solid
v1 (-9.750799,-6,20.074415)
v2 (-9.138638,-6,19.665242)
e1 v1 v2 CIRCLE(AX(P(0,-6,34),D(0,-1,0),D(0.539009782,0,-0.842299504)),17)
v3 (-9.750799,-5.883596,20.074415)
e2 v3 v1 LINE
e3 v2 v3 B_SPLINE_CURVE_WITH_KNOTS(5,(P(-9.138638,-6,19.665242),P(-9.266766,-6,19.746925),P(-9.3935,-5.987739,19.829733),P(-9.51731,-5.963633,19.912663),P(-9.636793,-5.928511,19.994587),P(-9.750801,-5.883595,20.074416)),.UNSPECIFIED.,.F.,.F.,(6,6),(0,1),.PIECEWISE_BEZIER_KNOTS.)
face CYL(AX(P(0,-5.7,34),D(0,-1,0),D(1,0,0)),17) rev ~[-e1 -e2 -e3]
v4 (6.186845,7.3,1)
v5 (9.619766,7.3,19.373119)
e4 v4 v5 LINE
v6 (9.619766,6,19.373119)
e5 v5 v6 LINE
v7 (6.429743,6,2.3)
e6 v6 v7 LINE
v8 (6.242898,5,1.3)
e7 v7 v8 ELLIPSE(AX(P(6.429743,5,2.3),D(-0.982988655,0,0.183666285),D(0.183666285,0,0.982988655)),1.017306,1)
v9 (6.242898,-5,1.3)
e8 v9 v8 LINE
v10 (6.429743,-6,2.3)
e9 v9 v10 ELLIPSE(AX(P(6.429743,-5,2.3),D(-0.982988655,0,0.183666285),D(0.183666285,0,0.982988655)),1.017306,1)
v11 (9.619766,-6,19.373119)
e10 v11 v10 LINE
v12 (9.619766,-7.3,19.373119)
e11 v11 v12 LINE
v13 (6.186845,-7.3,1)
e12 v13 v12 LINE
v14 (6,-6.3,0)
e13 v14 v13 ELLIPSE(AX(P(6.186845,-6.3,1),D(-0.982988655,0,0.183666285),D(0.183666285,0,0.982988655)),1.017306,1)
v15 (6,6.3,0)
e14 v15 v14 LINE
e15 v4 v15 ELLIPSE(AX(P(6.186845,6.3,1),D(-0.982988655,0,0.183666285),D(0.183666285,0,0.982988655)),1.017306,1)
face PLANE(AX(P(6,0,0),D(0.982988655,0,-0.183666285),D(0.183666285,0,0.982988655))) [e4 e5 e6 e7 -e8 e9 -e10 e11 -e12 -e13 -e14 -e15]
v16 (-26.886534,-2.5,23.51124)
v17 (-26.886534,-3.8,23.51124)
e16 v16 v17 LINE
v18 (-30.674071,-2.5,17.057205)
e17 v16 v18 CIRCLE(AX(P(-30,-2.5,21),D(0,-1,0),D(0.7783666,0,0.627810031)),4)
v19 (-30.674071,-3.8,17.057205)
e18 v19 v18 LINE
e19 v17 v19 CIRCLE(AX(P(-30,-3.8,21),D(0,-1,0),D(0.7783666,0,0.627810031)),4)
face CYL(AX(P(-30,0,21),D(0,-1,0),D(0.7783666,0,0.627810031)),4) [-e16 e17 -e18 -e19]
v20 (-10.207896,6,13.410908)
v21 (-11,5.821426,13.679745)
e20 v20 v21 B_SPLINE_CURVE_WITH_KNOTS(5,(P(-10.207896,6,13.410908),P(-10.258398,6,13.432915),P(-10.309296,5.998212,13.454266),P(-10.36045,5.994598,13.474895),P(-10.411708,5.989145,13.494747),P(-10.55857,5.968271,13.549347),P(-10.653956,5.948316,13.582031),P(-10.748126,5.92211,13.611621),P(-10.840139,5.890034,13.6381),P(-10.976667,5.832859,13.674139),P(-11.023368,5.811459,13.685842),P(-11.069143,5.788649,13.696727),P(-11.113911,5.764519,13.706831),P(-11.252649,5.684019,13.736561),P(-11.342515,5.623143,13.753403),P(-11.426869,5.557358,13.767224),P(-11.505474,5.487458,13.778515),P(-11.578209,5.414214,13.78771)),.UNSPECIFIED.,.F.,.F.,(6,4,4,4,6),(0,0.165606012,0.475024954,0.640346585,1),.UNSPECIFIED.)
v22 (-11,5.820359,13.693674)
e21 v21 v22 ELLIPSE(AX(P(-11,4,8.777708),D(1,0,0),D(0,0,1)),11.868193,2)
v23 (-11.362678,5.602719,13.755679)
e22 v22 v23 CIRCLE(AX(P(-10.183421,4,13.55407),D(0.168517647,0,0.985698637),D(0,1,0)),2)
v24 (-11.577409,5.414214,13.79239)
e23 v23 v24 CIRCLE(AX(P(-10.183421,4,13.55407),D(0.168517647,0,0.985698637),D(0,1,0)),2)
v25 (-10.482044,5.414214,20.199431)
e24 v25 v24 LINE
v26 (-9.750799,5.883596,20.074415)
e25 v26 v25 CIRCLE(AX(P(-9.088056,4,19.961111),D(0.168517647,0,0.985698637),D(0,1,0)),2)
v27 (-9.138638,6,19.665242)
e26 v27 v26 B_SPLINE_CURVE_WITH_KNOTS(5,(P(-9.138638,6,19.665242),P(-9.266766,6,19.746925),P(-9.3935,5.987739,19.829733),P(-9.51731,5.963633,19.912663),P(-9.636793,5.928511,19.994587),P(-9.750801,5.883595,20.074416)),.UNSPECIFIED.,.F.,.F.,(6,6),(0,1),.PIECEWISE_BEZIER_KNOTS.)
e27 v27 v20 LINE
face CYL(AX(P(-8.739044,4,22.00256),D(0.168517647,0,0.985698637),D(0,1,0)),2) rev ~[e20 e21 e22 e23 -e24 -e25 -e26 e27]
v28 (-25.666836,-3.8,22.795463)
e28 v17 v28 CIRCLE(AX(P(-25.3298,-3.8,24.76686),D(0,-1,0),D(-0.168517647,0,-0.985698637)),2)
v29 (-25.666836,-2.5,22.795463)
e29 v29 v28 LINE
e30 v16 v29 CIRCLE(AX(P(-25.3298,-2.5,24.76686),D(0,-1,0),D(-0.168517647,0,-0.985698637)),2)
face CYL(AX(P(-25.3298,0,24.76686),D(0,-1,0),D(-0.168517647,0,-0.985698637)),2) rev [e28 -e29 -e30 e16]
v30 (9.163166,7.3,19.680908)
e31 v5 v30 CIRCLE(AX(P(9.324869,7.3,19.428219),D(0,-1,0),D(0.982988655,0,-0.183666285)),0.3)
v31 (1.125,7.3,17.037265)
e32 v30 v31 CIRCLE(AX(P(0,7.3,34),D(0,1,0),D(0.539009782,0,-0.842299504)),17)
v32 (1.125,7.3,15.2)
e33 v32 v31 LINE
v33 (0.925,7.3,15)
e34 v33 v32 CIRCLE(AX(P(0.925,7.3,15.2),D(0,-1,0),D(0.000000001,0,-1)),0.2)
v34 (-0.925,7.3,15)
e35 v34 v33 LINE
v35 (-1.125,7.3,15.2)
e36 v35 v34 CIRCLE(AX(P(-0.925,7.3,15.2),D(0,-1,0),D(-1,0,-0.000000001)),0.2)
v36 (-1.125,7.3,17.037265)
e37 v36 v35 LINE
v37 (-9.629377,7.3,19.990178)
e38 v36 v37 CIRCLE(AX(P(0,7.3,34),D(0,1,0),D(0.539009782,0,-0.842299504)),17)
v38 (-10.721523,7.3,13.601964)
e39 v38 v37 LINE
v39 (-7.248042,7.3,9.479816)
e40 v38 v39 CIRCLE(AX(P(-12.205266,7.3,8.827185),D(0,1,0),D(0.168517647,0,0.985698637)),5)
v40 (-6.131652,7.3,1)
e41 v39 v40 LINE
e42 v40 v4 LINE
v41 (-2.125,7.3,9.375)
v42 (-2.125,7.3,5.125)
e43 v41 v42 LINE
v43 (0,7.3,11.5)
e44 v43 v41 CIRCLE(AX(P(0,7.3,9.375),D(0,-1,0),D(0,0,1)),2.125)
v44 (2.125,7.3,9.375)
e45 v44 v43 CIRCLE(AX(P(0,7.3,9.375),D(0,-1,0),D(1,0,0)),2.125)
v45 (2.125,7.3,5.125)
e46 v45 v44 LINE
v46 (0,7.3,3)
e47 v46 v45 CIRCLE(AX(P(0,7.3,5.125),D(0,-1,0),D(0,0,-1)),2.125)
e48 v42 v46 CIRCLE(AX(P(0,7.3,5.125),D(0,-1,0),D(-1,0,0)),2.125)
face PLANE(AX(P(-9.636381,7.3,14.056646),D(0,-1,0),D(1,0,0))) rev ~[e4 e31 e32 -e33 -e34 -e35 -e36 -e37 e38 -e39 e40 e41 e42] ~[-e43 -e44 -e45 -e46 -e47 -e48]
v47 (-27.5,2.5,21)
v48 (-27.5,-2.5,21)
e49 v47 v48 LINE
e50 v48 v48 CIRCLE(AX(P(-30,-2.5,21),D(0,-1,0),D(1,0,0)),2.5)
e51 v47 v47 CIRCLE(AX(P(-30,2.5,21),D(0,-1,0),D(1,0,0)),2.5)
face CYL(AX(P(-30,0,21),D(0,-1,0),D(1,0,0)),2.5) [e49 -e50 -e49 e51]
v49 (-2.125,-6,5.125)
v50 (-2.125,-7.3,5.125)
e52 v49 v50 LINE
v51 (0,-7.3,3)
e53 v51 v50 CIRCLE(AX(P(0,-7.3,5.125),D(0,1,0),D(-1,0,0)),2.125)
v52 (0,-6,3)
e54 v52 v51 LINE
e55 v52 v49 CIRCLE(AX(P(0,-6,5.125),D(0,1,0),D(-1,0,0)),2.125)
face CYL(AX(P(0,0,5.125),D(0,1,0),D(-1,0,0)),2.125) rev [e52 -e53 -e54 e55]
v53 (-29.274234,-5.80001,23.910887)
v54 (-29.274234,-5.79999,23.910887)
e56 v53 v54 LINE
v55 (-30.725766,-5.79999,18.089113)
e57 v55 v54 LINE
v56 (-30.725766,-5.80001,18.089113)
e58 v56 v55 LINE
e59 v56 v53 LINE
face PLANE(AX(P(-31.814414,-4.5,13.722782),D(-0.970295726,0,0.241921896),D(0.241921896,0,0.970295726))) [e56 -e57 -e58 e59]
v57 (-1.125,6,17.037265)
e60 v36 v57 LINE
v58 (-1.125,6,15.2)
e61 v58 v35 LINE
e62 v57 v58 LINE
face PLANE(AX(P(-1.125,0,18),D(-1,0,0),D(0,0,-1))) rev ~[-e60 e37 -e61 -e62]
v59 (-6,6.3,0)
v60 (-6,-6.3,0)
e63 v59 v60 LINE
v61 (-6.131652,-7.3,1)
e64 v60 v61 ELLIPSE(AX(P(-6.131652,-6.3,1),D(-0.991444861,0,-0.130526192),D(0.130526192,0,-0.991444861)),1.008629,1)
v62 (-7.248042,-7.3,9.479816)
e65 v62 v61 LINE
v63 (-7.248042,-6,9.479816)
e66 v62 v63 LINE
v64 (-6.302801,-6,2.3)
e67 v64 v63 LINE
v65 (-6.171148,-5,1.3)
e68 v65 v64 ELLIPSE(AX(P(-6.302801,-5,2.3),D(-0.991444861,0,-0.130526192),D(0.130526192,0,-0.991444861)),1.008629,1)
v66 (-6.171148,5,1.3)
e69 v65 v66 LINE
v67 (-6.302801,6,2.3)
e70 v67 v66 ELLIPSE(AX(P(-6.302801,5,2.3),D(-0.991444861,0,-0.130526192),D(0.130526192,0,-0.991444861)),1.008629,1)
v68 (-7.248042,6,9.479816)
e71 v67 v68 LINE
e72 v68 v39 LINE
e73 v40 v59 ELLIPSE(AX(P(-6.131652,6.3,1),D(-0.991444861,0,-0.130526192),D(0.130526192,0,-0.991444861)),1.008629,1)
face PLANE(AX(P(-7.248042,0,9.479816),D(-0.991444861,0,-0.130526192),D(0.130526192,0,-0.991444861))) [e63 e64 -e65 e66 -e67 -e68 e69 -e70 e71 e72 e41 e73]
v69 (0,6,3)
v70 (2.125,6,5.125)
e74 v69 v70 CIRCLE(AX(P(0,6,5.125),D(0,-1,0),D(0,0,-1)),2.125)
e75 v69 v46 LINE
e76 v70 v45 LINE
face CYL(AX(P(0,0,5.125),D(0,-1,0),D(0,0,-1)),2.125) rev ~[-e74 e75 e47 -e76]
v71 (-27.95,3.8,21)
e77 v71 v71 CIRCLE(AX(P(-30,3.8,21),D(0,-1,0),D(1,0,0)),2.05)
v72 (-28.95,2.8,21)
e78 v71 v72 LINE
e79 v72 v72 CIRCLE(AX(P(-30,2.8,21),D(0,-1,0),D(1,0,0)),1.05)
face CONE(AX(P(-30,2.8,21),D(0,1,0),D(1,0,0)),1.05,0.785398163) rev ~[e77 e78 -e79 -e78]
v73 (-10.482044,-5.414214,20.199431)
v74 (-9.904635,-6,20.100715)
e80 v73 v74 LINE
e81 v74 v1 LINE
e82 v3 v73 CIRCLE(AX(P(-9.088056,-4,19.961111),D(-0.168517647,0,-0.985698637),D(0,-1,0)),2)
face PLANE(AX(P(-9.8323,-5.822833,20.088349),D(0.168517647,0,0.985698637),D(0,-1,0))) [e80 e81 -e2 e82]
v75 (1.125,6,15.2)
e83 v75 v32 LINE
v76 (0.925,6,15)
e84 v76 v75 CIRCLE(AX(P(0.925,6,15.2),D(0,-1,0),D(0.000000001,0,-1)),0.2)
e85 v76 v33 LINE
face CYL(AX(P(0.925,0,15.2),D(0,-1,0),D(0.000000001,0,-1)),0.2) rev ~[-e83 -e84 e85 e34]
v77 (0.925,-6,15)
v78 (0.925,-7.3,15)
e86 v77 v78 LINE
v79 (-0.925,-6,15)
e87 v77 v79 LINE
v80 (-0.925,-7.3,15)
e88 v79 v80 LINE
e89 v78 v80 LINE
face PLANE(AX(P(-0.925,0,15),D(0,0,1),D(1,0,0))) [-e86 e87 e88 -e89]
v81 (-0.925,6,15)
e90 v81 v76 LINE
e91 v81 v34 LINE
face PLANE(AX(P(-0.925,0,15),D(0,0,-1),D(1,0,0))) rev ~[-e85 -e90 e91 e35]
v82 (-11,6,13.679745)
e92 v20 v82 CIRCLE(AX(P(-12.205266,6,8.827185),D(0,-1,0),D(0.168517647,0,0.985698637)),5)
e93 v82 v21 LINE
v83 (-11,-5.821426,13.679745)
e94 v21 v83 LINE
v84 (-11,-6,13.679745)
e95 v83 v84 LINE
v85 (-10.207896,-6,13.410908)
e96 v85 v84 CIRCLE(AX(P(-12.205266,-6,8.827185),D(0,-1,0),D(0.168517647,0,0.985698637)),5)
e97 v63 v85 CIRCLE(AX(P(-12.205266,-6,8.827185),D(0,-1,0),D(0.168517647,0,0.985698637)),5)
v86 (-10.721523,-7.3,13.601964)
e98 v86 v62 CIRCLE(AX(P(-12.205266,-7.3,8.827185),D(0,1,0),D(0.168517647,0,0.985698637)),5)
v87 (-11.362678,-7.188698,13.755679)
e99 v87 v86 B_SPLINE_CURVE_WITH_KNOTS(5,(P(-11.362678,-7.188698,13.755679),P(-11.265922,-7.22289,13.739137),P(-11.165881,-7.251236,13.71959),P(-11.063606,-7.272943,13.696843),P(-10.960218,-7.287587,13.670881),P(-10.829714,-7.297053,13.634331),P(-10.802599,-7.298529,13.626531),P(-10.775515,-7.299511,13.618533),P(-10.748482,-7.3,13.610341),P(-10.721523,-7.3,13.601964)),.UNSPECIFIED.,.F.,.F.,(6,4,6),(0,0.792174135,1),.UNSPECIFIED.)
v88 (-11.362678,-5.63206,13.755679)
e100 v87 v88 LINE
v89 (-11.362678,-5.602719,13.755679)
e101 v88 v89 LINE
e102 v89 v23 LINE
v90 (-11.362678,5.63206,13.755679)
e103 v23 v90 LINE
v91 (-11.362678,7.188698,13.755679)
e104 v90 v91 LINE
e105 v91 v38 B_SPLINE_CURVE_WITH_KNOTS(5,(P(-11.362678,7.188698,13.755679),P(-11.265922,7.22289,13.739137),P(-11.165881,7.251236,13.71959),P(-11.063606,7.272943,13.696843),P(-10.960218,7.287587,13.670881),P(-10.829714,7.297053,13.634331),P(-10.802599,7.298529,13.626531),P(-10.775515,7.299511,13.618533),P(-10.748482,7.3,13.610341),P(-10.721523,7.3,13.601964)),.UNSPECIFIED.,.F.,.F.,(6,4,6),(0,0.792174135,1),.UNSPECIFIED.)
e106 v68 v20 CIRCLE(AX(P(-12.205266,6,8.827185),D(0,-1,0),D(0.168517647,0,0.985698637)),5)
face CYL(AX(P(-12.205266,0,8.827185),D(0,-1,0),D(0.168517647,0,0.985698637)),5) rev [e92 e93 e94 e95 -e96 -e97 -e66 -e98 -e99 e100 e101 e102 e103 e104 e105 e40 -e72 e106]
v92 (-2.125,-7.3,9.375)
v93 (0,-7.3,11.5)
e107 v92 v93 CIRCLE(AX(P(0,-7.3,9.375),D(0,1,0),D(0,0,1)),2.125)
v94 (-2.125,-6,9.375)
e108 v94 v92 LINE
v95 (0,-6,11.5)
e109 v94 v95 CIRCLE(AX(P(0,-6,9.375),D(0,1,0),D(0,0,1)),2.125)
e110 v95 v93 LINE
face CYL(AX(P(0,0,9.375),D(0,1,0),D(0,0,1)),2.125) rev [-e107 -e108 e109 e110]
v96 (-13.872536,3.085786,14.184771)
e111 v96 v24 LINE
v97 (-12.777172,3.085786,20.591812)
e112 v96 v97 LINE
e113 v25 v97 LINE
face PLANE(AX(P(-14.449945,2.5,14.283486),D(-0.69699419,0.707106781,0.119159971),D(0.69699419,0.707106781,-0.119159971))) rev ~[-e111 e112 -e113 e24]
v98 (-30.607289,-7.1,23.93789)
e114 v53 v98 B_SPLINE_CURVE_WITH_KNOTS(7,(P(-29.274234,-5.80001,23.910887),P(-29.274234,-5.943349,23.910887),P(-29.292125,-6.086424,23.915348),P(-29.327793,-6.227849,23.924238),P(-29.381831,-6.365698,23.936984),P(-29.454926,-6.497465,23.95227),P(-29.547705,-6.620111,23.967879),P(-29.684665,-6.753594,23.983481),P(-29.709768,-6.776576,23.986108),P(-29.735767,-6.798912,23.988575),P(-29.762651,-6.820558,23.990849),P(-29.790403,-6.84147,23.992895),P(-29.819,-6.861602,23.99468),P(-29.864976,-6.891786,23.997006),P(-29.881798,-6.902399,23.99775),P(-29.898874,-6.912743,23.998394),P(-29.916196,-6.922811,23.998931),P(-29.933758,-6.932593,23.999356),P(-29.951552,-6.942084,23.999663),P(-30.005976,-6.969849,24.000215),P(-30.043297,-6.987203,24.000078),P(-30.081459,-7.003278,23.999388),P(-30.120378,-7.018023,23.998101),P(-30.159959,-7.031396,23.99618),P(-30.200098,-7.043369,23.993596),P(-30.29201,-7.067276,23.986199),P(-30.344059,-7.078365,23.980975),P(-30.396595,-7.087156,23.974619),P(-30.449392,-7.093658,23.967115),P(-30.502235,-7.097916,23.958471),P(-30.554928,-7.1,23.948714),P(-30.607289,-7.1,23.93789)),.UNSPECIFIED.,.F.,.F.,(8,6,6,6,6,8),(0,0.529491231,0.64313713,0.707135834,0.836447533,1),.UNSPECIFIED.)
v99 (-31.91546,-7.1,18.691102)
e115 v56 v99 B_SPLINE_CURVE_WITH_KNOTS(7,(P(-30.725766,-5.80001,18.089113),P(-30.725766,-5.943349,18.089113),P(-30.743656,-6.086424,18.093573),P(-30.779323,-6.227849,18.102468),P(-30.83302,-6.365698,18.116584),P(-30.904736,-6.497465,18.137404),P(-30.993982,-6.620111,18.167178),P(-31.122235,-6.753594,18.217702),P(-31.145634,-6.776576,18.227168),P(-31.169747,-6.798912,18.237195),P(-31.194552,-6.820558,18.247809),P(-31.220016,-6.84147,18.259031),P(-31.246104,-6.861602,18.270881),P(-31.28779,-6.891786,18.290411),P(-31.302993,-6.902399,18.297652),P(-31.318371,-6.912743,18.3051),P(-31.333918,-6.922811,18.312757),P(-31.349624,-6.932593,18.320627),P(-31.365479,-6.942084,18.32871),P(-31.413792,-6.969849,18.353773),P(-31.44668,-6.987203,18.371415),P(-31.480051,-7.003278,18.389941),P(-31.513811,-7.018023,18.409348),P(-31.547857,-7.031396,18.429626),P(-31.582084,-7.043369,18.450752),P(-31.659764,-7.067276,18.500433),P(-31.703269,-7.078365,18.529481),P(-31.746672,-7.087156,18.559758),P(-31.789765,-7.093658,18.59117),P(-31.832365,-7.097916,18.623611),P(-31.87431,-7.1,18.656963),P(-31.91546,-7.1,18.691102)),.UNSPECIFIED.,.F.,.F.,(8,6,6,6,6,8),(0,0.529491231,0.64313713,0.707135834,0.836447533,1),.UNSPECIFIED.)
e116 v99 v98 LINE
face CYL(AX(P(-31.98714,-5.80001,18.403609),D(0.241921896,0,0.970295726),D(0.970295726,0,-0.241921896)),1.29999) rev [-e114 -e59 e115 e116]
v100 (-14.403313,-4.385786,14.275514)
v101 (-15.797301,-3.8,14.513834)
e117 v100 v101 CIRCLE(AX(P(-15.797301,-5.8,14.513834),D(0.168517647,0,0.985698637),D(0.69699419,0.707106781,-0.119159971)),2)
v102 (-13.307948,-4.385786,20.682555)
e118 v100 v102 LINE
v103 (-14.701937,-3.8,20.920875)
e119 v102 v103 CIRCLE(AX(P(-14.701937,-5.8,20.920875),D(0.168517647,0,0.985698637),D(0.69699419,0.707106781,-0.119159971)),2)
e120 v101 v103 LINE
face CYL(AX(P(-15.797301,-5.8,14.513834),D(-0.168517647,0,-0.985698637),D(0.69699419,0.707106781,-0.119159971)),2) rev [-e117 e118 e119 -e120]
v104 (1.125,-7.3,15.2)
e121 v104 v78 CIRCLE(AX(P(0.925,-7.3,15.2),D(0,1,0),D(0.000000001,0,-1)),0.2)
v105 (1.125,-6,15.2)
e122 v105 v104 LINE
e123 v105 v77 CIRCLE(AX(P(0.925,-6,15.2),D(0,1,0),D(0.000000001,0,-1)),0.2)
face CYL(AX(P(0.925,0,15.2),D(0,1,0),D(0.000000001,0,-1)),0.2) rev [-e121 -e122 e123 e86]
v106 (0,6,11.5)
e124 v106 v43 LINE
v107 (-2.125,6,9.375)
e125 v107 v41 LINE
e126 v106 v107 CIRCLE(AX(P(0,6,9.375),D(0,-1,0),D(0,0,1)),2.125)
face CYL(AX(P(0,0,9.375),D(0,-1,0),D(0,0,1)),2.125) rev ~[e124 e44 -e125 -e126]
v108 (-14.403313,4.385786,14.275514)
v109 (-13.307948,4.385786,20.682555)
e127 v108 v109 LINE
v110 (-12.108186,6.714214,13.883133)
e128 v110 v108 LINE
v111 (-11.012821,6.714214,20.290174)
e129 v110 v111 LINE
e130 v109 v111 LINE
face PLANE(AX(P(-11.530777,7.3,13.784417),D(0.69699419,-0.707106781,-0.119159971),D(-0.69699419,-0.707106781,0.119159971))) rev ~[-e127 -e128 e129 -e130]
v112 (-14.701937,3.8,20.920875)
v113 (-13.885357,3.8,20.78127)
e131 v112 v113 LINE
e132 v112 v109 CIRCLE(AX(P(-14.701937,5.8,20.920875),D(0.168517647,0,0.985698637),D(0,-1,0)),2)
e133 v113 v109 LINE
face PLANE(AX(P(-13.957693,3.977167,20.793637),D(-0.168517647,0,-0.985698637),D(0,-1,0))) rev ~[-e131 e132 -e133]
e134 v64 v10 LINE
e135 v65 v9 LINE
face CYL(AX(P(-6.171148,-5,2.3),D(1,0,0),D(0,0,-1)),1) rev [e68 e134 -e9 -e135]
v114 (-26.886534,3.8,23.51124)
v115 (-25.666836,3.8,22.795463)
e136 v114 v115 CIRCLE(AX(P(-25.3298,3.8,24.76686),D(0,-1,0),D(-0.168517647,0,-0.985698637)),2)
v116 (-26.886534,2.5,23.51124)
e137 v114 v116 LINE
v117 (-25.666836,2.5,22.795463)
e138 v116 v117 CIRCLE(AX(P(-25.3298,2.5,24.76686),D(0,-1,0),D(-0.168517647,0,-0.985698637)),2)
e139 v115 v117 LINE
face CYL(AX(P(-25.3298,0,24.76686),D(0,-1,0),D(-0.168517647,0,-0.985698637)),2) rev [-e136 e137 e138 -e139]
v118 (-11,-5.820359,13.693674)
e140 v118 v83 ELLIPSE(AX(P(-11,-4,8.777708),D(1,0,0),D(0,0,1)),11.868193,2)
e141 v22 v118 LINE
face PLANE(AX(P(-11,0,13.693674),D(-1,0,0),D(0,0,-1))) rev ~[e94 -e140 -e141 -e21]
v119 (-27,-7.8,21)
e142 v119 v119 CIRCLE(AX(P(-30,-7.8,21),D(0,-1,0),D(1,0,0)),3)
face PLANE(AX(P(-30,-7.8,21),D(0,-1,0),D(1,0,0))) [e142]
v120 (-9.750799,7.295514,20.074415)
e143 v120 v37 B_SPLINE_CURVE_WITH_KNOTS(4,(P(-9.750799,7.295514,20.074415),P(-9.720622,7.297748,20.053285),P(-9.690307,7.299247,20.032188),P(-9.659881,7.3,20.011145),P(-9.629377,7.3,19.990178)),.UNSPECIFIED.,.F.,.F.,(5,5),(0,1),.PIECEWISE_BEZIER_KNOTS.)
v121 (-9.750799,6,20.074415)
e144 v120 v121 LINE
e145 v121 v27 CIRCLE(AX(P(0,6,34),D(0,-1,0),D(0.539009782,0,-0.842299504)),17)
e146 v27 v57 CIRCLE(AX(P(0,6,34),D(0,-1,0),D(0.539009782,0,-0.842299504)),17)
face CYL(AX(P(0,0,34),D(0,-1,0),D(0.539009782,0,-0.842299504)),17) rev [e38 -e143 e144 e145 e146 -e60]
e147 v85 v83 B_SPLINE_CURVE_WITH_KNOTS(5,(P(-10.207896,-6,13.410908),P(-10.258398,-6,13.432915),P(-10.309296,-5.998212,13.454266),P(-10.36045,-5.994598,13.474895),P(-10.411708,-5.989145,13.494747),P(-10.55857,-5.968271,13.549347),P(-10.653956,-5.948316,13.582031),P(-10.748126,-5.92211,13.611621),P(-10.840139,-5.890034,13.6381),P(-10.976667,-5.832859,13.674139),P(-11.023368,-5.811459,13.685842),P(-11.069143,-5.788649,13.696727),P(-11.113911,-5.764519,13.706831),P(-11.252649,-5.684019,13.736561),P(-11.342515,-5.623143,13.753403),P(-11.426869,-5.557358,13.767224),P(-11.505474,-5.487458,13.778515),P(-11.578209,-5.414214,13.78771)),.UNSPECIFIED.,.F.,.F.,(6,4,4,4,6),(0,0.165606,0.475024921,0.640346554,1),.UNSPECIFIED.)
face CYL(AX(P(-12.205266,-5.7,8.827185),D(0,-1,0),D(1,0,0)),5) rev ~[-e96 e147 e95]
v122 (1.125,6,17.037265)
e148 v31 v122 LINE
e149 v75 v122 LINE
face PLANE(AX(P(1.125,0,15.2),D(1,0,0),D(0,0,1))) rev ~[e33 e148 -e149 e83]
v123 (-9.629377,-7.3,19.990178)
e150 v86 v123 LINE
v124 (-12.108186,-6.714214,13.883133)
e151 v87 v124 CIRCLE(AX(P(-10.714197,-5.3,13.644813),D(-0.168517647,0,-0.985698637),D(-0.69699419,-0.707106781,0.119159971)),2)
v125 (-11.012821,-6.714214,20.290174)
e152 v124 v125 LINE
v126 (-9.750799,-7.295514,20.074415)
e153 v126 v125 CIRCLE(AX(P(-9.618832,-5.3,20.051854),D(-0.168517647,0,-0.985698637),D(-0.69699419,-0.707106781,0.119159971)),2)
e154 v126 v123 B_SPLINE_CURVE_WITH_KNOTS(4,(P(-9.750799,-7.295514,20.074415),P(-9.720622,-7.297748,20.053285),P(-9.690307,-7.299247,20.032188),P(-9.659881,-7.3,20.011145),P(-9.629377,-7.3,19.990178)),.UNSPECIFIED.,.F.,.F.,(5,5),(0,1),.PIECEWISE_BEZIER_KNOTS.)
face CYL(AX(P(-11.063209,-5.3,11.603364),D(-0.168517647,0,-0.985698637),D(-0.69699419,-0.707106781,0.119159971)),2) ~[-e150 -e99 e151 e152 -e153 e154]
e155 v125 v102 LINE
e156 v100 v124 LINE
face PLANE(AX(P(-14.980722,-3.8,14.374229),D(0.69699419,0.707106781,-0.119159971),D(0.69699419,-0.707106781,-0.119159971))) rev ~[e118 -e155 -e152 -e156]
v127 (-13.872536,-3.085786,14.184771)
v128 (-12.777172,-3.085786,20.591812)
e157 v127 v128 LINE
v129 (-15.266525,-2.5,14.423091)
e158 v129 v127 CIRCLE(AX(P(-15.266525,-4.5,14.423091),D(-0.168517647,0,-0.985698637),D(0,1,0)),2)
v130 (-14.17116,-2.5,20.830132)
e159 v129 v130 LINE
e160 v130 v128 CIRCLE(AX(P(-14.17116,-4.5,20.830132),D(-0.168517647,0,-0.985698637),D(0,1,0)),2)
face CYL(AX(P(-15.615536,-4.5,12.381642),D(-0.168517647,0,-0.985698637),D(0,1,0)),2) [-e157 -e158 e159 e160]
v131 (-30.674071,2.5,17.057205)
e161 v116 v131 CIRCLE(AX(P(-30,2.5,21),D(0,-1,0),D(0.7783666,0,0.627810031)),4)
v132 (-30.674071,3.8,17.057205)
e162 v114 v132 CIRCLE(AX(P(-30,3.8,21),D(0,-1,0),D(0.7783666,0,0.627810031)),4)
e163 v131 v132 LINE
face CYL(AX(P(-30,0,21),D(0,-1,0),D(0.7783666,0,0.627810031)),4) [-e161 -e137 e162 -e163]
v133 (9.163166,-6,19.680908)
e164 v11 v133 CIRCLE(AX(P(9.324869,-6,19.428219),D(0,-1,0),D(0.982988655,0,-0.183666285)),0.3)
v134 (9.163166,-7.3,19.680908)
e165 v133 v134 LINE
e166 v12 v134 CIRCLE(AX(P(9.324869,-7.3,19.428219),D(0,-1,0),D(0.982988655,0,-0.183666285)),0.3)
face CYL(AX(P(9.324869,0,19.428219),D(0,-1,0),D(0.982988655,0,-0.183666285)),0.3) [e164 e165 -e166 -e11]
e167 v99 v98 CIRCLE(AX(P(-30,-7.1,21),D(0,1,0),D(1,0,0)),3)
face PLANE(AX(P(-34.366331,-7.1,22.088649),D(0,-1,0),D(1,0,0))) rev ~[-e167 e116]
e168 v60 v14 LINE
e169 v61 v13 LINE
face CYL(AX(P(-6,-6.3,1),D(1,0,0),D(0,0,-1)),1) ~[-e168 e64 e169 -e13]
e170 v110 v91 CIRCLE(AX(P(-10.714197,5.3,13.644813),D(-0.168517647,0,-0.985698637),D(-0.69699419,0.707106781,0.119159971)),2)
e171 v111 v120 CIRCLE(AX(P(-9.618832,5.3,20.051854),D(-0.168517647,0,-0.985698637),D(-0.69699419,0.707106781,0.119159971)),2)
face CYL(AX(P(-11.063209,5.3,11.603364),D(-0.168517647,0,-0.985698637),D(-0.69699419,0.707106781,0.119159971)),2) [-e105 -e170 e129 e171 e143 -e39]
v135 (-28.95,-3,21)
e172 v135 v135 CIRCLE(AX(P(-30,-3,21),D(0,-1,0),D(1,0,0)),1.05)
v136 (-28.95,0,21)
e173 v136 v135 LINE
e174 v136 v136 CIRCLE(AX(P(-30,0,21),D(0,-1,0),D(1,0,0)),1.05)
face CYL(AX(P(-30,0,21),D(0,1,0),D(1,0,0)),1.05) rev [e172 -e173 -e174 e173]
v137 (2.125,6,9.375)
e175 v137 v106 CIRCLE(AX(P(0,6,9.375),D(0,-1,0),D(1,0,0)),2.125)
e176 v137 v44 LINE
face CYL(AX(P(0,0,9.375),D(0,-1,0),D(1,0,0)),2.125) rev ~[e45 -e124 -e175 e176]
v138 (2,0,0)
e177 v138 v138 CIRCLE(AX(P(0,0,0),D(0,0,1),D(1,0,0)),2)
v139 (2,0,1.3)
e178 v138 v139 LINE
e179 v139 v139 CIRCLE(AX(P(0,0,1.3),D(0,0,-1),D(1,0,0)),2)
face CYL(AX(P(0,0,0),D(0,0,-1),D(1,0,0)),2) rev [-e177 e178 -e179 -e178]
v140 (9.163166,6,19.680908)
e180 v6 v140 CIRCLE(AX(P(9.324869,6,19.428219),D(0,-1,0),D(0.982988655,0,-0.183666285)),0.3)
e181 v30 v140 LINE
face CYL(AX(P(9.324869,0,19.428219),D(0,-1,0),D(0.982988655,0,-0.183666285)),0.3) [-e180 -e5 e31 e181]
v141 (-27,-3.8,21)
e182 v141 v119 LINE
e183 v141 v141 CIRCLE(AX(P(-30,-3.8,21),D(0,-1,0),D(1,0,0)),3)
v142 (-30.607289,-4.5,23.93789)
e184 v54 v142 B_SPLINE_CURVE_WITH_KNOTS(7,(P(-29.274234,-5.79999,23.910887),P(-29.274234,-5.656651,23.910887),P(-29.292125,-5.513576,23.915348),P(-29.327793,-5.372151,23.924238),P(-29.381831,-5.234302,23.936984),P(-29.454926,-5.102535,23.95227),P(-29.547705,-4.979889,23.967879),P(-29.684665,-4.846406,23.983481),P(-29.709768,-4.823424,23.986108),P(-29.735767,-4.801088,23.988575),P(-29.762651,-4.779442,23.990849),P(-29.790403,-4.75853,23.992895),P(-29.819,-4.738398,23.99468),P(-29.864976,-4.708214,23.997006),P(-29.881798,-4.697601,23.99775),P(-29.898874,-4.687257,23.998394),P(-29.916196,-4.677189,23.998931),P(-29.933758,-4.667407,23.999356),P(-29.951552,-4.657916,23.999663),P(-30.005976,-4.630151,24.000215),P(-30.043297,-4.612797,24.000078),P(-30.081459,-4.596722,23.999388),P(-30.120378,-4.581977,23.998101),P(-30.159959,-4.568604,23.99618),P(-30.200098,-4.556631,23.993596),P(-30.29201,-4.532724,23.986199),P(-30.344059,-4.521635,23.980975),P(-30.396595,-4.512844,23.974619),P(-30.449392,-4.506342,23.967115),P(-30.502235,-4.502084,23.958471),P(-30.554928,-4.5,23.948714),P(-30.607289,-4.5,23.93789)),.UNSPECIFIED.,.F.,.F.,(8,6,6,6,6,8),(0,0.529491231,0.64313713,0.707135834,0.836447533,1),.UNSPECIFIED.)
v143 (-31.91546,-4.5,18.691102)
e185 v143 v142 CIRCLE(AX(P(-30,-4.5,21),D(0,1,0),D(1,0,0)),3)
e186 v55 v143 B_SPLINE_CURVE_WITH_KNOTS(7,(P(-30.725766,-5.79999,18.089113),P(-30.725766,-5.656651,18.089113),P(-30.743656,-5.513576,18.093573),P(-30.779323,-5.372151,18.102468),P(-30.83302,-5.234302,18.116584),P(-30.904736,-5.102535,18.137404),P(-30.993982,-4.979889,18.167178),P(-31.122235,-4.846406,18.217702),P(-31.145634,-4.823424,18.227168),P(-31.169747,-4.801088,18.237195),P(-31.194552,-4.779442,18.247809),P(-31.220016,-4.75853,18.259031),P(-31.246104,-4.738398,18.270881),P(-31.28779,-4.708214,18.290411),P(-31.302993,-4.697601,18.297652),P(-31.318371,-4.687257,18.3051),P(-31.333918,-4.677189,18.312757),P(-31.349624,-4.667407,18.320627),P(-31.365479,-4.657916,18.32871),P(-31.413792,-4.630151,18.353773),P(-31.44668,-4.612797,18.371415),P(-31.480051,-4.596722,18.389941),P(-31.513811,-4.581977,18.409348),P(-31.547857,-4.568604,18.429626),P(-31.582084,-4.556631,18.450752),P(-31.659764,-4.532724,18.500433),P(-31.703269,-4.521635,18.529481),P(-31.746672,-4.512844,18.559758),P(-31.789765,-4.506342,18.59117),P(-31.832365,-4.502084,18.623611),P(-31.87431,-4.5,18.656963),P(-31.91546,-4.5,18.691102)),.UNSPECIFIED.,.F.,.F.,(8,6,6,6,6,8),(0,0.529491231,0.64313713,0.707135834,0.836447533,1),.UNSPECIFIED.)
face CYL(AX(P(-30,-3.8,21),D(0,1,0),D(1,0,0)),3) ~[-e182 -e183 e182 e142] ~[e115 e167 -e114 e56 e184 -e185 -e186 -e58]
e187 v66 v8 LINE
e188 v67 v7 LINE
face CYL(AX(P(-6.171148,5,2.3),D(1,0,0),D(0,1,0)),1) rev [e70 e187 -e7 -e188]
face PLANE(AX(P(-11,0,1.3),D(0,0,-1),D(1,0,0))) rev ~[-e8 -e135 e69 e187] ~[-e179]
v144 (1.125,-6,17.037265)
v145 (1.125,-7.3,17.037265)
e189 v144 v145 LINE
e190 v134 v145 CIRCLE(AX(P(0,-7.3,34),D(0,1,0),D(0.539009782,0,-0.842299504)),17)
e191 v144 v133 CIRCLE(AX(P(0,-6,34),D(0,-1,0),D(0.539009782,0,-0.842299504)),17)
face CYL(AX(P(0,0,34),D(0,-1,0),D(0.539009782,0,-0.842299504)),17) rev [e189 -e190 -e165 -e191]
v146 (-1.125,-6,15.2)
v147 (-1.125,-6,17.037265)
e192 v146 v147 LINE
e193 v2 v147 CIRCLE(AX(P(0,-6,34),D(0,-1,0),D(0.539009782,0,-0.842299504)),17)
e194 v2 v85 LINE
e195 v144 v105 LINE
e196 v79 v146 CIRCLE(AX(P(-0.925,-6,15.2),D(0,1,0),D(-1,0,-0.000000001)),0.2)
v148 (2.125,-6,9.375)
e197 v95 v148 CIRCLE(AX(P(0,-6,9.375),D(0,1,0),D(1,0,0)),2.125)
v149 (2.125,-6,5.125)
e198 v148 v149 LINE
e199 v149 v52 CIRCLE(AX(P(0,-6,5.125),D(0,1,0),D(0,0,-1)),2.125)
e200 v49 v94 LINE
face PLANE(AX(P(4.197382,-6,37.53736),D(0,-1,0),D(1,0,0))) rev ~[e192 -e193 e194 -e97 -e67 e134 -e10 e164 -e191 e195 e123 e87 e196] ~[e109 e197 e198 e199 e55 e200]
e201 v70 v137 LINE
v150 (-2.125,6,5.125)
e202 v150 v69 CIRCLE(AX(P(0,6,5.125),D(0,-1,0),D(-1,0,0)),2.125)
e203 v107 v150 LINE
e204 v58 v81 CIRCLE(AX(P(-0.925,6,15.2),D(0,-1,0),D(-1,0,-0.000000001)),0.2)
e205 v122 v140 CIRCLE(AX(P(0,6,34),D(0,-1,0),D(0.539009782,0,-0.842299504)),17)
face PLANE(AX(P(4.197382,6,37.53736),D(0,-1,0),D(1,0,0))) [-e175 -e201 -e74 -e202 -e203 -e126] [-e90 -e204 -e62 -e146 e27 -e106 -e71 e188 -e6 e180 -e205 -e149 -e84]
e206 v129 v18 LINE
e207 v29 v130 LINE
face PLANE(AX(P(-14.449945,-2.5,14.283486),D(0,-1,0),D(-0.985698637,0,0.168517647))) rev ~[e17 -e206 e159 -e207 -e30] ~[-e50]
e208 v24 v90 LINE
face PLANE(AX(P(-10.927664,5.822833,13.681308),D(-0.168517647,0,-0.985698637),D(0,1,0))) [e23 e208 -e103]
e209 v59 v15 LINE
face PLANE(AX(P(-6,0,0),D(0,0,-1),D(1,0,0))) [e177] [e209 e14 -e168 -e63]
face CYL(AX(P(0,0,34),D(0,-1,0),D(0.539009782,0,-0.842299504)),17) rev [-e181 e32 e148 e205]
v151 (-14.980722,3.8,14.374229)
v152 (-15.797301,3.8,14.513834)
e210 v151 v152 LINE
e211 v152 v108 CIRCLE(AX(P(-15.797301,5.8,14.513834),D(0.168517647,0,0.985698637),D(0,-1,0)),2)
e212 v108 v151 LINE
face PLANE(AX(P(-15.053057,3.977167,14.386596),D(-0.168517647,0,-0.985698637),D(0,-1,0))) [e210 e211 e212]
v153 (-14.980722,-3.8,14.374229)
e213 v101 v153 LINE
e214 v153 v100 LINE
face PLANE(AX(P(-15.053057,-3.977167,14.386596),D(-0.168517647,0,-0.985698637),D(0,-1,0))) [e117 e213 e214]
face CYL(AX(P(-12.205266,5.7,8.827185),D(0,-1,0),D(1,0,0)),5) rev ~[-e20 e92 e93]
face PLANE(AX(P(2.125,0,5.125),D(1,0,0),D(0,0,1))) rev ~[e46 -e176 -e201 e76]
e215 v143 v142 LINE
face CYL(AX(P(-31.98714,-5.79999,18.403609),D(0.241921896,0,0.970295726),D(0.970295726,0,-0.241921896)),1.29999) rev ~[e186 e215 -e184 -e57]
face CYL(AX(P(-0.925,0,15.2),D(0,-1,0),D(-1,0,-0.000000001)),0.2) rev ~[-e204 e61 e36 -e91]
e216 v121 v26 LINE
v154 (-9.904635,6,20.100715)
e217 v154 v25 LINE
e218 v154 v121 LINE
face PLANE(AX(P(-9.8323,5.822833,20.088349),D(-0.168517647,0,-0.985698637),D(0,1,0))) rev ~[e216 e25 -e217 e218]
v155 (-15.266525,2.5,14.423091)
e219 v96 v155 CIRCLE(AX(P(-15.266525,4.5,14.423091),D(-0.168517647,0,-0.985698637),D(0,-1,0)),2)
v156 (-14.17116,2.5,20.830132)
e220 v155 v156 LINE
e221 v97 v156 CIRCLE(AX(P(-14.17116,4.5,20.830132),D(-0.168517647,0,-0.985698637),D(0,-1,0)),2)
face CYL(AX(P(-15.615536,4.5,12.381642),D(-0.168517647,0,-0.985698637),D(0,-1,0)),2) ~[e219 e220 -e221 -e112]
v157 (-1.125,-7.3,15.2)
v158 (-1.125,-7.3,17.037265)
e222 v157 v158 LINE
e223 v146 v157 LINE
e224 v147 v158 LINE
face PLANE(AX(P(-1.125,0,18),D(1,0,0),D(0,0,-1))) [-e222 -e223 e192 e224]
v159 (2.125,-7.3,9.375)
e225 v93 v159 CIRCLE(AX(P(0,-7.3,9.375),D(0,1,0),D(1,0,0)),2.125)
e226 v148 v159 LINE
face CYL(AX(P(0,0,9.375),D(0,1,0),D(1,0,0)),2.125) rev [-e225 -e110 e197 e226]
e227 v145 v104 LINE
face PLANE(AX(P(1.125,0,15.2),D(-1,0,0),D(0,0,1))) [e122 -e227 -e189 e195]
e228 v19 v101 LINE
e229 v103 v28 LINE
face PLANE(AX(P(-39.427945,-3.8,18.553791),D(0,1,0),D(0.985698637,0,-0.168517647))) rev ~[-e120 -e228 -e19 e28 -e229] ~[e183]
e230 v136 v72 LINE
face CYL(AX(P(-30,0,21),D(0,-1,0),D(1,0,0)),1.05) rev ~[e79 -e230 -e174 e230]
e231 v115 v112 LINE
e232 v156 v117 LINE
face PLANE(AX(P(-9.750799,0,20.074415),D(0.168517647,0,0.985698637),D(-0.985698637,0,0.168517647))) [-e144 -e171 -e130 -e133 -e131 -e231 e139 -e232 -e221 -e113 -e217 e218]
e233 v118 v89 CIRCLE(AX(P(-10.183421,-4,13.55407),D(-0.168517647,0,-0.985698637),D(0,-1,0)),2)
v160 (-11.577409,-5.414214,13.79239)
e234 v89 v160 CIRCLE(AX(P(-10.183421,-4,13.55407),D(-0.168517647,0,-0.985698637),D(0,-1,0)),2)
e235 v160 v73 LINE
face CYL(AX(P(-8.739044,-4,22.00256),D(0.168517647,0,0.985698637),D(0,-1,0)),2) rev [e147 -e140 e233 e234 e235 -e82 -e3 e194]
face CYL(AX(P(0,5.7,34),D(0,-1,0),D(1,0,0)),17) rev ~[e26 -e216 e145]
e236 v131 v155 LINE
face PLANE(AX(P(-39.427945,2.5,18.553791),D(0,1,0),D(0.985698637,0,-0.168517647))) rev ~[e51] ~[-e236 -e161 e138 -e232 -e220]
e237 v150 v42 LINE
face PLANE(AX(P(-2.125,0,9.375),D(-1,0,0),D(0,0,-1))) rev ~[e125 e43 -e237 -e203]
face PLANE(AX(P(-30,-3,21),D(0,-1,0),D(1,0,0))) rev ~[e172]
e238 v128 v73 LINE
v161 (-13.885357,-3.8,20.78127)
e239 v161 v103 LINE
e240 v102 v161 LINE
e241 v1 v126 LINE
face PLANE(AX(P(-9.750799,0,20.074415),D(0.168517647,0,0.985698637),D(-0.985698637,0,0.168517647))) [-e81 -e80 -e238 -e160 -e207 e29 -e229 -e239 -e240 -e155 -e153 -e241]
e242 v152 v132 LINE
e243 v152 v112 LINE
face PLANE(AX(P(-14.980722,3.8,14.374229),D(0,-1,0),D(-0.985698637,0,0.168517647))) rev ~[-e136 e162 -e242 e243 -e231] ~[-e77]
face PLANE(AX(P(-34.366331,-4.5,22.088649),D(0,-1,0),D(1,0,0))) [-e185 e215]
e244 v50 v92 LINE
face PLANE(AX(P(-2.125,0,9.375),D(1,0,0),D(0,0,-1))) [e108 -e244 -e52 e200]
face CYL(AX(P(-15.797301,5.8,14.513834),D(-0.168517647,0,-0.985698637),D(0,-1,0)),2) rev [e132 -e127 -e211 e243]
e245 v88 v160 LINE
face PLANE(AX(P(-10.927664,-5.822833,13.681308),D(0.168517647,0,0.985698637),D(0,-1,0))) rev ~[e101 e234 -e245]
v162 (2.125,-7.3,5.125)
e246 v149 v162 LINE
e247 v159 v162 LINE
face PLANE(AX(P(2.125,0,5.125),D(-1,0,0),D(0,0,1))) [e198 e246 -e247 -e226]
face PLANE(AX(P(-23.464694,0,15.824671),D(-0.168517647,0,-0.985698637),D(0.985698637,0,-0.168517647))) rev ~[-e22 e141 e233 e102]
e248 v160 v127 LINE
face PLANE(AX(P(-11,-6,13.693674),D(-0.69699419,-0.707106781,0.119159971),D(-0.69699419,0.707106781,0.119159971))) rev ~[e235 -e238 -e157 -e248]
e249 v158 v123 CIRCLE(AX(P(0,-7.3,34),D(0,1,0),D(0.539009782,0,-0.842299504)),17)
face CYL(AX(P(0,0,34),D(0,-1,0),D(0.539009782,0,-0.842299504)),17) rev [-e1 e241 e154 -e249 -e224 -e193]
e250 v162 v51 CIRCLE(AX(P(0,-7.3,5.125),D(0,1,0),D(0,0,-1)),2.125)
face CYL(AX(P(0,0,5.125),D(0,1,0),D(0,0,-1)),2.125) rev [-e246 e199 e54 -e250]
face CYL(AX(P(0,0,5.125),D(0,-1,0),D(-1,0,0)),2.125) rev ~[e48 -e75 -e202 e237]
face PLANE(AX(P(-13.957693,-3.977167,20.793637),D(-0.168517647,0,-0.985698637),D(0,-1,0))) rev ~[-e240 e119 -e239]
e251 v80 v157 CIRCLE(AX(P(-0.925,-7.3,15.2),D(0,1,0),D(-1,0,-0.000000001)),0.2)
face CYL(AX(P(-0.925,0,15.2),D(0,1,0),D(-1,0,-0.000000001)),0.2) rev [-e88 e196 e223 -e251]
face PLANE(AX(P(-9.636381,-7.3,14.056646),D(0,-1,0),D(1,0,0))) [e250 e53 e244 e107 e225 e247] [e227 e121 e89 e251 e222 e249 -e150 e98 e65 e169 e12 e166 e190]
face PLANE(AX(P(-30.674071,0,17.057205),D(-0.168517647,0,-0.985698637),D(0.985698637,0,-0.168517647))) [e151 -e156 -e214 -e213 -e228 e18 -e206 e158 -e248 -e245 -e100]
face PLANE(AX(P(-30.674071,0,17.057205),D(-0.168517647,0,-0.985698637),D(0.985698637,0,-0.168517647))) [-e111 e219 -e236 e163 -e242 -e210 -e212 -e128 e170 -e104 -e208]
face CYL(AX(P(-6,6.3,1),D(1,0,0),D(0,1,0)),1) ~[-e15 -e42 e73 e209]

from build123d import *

# Parameters (mm, degrees)
F1_DEPTH       = 7.3
F1_DEPTH_BACK  = 7.3
F3_DEPTH       = 6
F3_DEPTH_BACK  = 6
F5_DEPTH       = 10
F5_DEPTH_BACK  = 10
F8_DEPTH       = 25
F9_R           = 2.5
F10_DEPTH      = 2.5
F10_DEPTH_BACK = 2.5
F11_T1_DEPTH   = 6.5
F11_T6_DEPTH   = 12.7132034356
F11_S7_R       = 5
F11_T8_DEPTH   = 8
F11_S10_R      = 17
F11_T11_DEPTH  = 8
F11_T15_DEPTH  = 8.5710678119
F11_T20_DEPTH  = 12.7132034356
F11_S21_R      = 5
F11_T22_DEPTH  = 8
F11_S24_R      = 17
F11_T25_DEPTH  = 8
F11_T29_DEPTH  = 8.5710678119
F11_T31_DEPTH  = 10.6421356237
F12_R          = 1
F13_R          = 2
F14_DEPTH      = 5
F15_R          = 1.05
F16_DEPTH      = 3
F16_DEPTH_BACK = 10
F17_SIZE       = 1
F19_START      = 3.8
F18_R          = 3
F19_DEPTH      = 4
F21_START      = 4.5
F21_DEPTH      = 2.6
F22_R          = 1.29999


# Not quite as in the source:
# - a fillet or chamfer that OpenCascade refuses, or shapes differently, is made with other operations: its cross-section is extruded or revolved along the edge and cut away or added
# - a fillet or chamfer is up to 0.001 mm smaller than in the source, because OpenCascade refuses the exact size


with BuildPart() as f1:
    # F0 (on Front) → F1 (new body, two sides)
    with BuildSketch(Plane.XZ) as f1_sk:
        with BuildLine():
            Line((-7.2480415045, 9.479816391), (-6, 0))
            Line((-6, 0), (6, 0))
            Line((6, 0), (9.6197658273, 19.3731186918))
            ThreePointArc((9.6197658273, 19.3731186918), (9.492555749, 19.6769779623), (9.1631662961, 19.6809084286))
            ThreePointArc((9.1631662961, 19.6809084286), (-0.3536100614, 17.0036780472), (-9.750799418, 20.0744152471))
            Line((-9.750799418, 20.0744152471), (-25.666835692, 22.7954629152))
            ThreePointArc((-25.666835692, 22.7954629152), (-26.3420622378, 23.0419468668), (-26.8865335991, 23.511240126))
            ThreePointArc((-26.8865335991, 23.511240126), (-33.4498266444, 23.0245236782), (-30.6740705867, 17.0572054525))
            Line((-30.6740705867, 17.0572054525), (-11.362677578, 13.7556786143))
            ThreePointArc((-11.362677578, 13.7556786143), (-8.6024605414, 12.2941429125), (-7.2480415045, 9.479816391))
        make_face()
    extrude(amount=F1_DEPTH)
    extrude(f1_sk.sketch, amount=-F1_DEPTH_BACK)

    # F2 (on Front) → F3 (cut, two sides)
    with BuildSketch(Plane.XZ) as f3_sk:
        Polygon((15, 1.3), (15, 78.0352148958), (0, 78.0352148958), (-11, 13.6936742961), (-11, 1.3), align=None)
    extrude(amount=F3_DEPTH, mode=Mode.SUBTRACT)
    extrude(f3_sk.sketch, amount=-F3_DEPTH_BACK, mode=Mode.SUBTRACT)

    # F4 (on Front) → F5 (cut, two sides)
    with BuildSketch(Plane.XZ) as f5_sk:
        with BuildLine():
            Line((0, 18), (-1.125, 18))
            Line((-1.125, 18), (-1.125, 15.2))
            ThreePointArc((-1.125, 15.2), (-1.0664213562, 15.0585786438), (-0.925, 15))
            Line((-0.925, 15), (0, 15))
            Line((0, 15), (0.925, 15))
            ThreePointArc((0.925, 15), (1.0664213562, 15.0585786438), (1.125, 15.2))
            Line((1.125, 15.2), (1.125, 18))
            Line((1.125, 18), (0, 18))
        make_face()
        with BuildLine():
            ThreePointArc((0, 11.5), (-1.50260191, 10.87760191), (-2.125, 9.375))
            Line((-2.125, 9.375), (-2.125, 5.125))
            ThreePointArc((-2.125, 5.125), (-1.50260191, 3.62239809), (0, 3))
            ThreePointArc((0, 3), (1.50260191, 3.62239809), (2.125, 5.125))
            Line((2.125, 5.125), (2.125, 9.375))
            ThreePointArc((2.125, 9.375), (1.50260191, 10.87760191), (0, 11.5))
        make_face()
    extrude(amount=F5_DEPTH, mode=Mode.SUBTRACT)
    extrude(f5_sk.sketch, amount=-F5_DEPTH_BACK, mode=Mode.SUBTRACT)

    # F7 (on offset) → F8 (cut)
    with BuildSketch(Plane(origin=(1.9622434031, 0, 11.4776148716), x_dir=(0.9856986369, 0, -0.1685176467), z_dir=(-0.1685176467, 0, -0.9856986369))):
        Polygon((-41.9907133171, -7.3), (-13.6887884036, -7.3), (-17.1887884036, -3.8), (-41.9907133171, -3.8), align=None)
        Polygon((-41.9907133171, 7.3), (-41.9907133171, 3.8), (-17.1887884036, 3.8), (-13.6887884036, 7.3), align=None)
        Polygon((-16.6503107725, -2.5), (-13.1503107725, -6), (-13.1503107725, 0), (-13.1503107725, 6), (-16.6503107725, 2.5), (-41.9907133171, 2.5), (-41.9907133171, 0), (-41.9907133171, -2.5), align=None)
    extrude(amount=-F8_DEPTH, mode=Mode.SUBTRACT)

    # F9 (on Front) → F10 (join, two sides)
    with BuildSketch(Plane.XZ) as f10_sk:
        with Locations((-30, 21)):
            Circle(F9_R)
    extrude(amount=F10_DEPTH)
    extrude(f10_sk.sketch, amount=-F10_DEPTH_BACK)

    # F11: fillet of radius 2 on 8 edges, made by hand

    # F11_s2 → F11_t1 (join)
    with BuildSketch(Plane(origin=(1.9622434031, 0, 11.4776148716), x_dir=(0, 1, 0), z_dir=(0.1685176467, 0, 0.9856986369))):
        with BuildLine():
            ThreePointArc((3.8, 18.0172155284), (3.952240935, 17.2518486636), (4.3857864376, 16.603001966))
            Line((4.3857864376, 16.603001966), (3.8, 17.1887884036))
            Line((3.8, 17.1887884036), (3.8, 18.0172155284))
        make_face()
        with BuildLine():
            ThreePointArc((-4.3857864376, 16.603001966), (-3.952240935, 17.2518486636), (-3.8, 18.0172155284))
            Line((-3.8, 18.0172155284), (-3.8, 17.1887884036))
            Line((-3.8, 17.1887884036), (-4.3857864376, 16.603001966))
        make_face()
    extrude(amount=F11_T1_DEPTH)


with BuildPart() as f11_tool4:
    # F11_s5 → F11_t6 (new body)
    with BuildSketch(Plane(origin=(3.0576081065, 0, 17.8846560114), x_dir=(0, 1, 0), z_dir=(-0.1685176467, 0, -0.9856986369))):
        with BuildLine():
            ThreePointArc((-6, -12.3218836478), (-5.847759065, -13.0872505125), (-5.4142135624, -13.7360972102))
            Line((-5.4142135624, -13.7360972102), (-6, -13.1503107725))
            Line((-6, -13.1503107725), (-6, -12.3218836478))
        make_face()
    extrude(amount=F11_T6_DEPTH)

    # F11_s7 → F11_t8 (cut, symmetric)
    with BuildSketch(Plane.XZ.offset(5.7)):
        with Locations((-12.2052658114, 8.8271854299)):
            Circle(F11_S7_R)
    extrude(amount=F11_T8_DEPTH, both=True, mode=Mode.SUBTRACT)

    split(bisect_by=Plane.YZ.offset(-11), keep=Keep.TOP)

    # F11_s10 → F11_t11 (cut, symmetric)
    with BuildSketch(Plane.XZ.offset(5.7)):
        with Locations((0, 34)):
            Circle(F11_S10_R)
    extrude(amount=F11_T11_DEPTH, both=True, mode=Mode.SUBTRACT)


with BuildPart() as f1_1:
    add(f1.part)

    # F11_t3: union F11_tool4
    add(f11_tool4.part)


with BuildPart() as f11_tool13:
    # F11_s14 → F11_t15 (new body)
    with BuildSketch(Plane(origin=(3.4066195803, 0, 19.9261047304), x_dir=(0, 1, 0), z_dir=(-0.1685176467, 0, -0.9856986369))):
        with BuildLine():
            ThreePointArc((-6, -12.3218836478), (-5.847759065, -13.0872505125), (-5.4142135624, -13.7360972102))
            Line((-5.4142135624, -13.7360972102), (-6, -13.1503107725))
            Line((-6, -13.1503107725), (-6, -12.3218836478))
        make_face()
    extrude(amount=F11_T15_DEPTH)

    split(bisect_by=Plane.YZ.offset(-11), keep=Keep.BOTTOM)


with BuildPart() as f1_2:
    add(f1_1.part)

    # F11_t12: union F11_tool13
    add(f11_tool13.part)


with BuildPart() as f11_tool18:
    # F11_s19 → F11_t20 (new body)
    with BuildSketch(Plane(origin=(3.0576081065, 0, 17.8846560114), x_dir=(0, 1, 0), z_dir=(-0.1685176467, 0, -0.9856986369))):
        with BuildLine():
            ThreePointArc((6, -12.3218836478), (5.847759065, -13.0872505125), (5.4142135624, -13.7360972102))
            Line((5.4142135624, -13.7360972102), (6, -13.1503107725))
            Line((6, -13.1503107725), (6, -12.3218836478))
        make_face()
    extrude(amount=F11_T20_DEPTH)

    # F11_s21 → F11_t22 (cut, symmetric)
    with BuildSketch(Plane.XZ.offset(-5.7)):
        with Locations((-12.2052658114, 8.8271854299)):
            Circle(F11_S21_R)
    extrude(amount=F11_T22_DEPTH, both=True, mode=Mode.SUBTRACT)

    split(bisect_by=Plane.YZ.offset(-11), keep=Keep.TOP)

    # F11_s24 → F11_t25 (cut, symmetric)
    with BuildSketch(Plane.XZ.offset(-5.7)):
        with Locations((0, 34)):
            Circle(F11_S24_R)
    extrude(amount=F11_T25_DEPTH, both=True, mode=Mode.SUBTRACT)


with BuildPart() as f1_3:
    add(f1_2.part)

    # F11_t17: union F11_tool18
    add(f11_tool18.part)


with BuildPart() as f11_tool27:
    # F11_s28 → F11_t29 (new body)
    with BuildSketch(Plane(origin=(3.4066195803, 0, 19.9261047304), x_dir=(0, 1, 0), z_dir=(-0.1685176467, 0, -0.9856986369))):
        with BuildLine():
            ThreePointArc((6, -12.3218836478), (5.847759065, -13.0872505125), (5.4142135624, -13.7360972102))
            Line((5.4142135624, -13.7360972102), (6, -13.1503107725))
            Line((6, -13.1503107725), (6, -12.3218836478))
        make_face()
    extrude(amount=F11_T29_DEPTH)

    split(bisect_by=Plane.YZ.offset(-11), keep=Keep.BOTTOM)


with BuildPart() as f1_4:
    add(f1_3.part)

    # F11_t26: union F11_tool27
    add(f11_tool27.part)

    # F11_s32 → F11_t31 (cut)
    with BuildSketch(Plane(origin=(1.6132319293, 0, 9.4361661525), x_dir=(0, 1, 0), z_dir=(0.1685176467, 0, 0.9856986369))):
        with BuildLine():
            ThreePointArc((6.7142135624, 14.2745748413), (7.147759065, 13.6257281436), (7.3, 12.8603612789))
            Line((7.3, 12.8603612789), (7.3, 13.6887884036))
            Line((7.3, 13.6887884036), (6.7142135624, 14.2745748413))
        make_face()
        with BuildLine():
            ThreePointArc((-2.5, 17.4787378973), (-2.652240935, 16.7133710326), (-3.0857864376, 16.0645243349))
            Line((-3.0857864376, 16.0645243349), (-2.5, 16.6503107725))
            Line((-2.5, 16.6503107725), (-2.5, 17.4787378973))
        make_face()
        with BuildLine():
            ThreePointArc((-6.7142135624, 14.2745748413), (-7.147759065, 13.6257281436), (-7.3, 12.8603612789))
            Line((-7.3, 12.8603612789), (-7.3, 13.6887884036))
            Line((-7.3, 13.6887884036), (-6.7142135624, 14.2745748413))
        make_face()
        with BuildLine():
            ThreePointArc((2.5, 17.4787378973), (2.652240935, 16.7133710326), (3.0857864376, 16.0645243349))
            Line((3.0857864376, 16.0645243349), (2.5, 16.6503107725))
            Line((2.5, 16.6503107725), (2.5, 17.4787378973))
        make_face()
    extrude(amount=F11_T31_DEPTH, mode=Mode.SUBTRACT)

    # F12
    f12_edges = [f1_4.edges().sort_by_distance(p)[0] for p in [
        (0.035875, 6, 1.3),
        (0, -7.3, 0),
        (0.035875, -6, 1.3),
        (0, 7.3, 0),
    ]]
    fillet(f12_edges, radius=F12_R)

    # F13 (on Top) → F14 (cut)
    with BuildSketch(Plane.XY):
        Circle(F13_R)
    extrude(amount=F14_DEPTH, mode=Mode.SUBTRACT)

    # F15 (on Front) → F16 (cut, two sides)
    with BuildSketch(Plane.XZ) as f16_sk:
        with Locations((-30, 21)):
            Circle(F15_R)
    extrude(amount=F16_DEPTH, mode=Mode.SUBTRACT)
    extrude(f16_sk.sketch, amount=-F16_DEPTH_BACK, mode=Mode.SUBTRACT)

    # F17
    f17_edges = [f1_4.edges().sort_by_distance(p)[0] for p in [
        (-31.05, 3.8, 21),
    ]]
    chamfer(f17_edges, length=F17_SIZE)

    # F18 (on Front) → F19 (join)
    with BuildSketch(Plane.XZ.offset(F19_START)):
        with Locations((-30, 21)):
            Circle(F18_R)
    extrude(amount=F19_DEPTH)

    # F20 (on Front) → F21 (cut)
    with BuildSketch(Plane.XZ.offset(F21_START)):
        Polygon((-40.5470757535, 15.9000791133), (-31.814414217, 13.7227820529), (-28.185585783, 28.2772179471), (-36.9182473195, 30.4545150075), align=None)
    extrude(amount=F21_DEPTH, mode=Mode.SUBTRACT)

    # F22 (radius 1.3 in the source; OpenCascade refuses exactly that, so slightly less here)
    f22_edges = [f1_4.edges().sort_by_distance(p)[0] for p in [
        (-30, -4.5, 21),
        (-30, -7.1, 21),
    ]]
    fillet(f22_edges, radius=F22_R)


solid = f1_4.part
